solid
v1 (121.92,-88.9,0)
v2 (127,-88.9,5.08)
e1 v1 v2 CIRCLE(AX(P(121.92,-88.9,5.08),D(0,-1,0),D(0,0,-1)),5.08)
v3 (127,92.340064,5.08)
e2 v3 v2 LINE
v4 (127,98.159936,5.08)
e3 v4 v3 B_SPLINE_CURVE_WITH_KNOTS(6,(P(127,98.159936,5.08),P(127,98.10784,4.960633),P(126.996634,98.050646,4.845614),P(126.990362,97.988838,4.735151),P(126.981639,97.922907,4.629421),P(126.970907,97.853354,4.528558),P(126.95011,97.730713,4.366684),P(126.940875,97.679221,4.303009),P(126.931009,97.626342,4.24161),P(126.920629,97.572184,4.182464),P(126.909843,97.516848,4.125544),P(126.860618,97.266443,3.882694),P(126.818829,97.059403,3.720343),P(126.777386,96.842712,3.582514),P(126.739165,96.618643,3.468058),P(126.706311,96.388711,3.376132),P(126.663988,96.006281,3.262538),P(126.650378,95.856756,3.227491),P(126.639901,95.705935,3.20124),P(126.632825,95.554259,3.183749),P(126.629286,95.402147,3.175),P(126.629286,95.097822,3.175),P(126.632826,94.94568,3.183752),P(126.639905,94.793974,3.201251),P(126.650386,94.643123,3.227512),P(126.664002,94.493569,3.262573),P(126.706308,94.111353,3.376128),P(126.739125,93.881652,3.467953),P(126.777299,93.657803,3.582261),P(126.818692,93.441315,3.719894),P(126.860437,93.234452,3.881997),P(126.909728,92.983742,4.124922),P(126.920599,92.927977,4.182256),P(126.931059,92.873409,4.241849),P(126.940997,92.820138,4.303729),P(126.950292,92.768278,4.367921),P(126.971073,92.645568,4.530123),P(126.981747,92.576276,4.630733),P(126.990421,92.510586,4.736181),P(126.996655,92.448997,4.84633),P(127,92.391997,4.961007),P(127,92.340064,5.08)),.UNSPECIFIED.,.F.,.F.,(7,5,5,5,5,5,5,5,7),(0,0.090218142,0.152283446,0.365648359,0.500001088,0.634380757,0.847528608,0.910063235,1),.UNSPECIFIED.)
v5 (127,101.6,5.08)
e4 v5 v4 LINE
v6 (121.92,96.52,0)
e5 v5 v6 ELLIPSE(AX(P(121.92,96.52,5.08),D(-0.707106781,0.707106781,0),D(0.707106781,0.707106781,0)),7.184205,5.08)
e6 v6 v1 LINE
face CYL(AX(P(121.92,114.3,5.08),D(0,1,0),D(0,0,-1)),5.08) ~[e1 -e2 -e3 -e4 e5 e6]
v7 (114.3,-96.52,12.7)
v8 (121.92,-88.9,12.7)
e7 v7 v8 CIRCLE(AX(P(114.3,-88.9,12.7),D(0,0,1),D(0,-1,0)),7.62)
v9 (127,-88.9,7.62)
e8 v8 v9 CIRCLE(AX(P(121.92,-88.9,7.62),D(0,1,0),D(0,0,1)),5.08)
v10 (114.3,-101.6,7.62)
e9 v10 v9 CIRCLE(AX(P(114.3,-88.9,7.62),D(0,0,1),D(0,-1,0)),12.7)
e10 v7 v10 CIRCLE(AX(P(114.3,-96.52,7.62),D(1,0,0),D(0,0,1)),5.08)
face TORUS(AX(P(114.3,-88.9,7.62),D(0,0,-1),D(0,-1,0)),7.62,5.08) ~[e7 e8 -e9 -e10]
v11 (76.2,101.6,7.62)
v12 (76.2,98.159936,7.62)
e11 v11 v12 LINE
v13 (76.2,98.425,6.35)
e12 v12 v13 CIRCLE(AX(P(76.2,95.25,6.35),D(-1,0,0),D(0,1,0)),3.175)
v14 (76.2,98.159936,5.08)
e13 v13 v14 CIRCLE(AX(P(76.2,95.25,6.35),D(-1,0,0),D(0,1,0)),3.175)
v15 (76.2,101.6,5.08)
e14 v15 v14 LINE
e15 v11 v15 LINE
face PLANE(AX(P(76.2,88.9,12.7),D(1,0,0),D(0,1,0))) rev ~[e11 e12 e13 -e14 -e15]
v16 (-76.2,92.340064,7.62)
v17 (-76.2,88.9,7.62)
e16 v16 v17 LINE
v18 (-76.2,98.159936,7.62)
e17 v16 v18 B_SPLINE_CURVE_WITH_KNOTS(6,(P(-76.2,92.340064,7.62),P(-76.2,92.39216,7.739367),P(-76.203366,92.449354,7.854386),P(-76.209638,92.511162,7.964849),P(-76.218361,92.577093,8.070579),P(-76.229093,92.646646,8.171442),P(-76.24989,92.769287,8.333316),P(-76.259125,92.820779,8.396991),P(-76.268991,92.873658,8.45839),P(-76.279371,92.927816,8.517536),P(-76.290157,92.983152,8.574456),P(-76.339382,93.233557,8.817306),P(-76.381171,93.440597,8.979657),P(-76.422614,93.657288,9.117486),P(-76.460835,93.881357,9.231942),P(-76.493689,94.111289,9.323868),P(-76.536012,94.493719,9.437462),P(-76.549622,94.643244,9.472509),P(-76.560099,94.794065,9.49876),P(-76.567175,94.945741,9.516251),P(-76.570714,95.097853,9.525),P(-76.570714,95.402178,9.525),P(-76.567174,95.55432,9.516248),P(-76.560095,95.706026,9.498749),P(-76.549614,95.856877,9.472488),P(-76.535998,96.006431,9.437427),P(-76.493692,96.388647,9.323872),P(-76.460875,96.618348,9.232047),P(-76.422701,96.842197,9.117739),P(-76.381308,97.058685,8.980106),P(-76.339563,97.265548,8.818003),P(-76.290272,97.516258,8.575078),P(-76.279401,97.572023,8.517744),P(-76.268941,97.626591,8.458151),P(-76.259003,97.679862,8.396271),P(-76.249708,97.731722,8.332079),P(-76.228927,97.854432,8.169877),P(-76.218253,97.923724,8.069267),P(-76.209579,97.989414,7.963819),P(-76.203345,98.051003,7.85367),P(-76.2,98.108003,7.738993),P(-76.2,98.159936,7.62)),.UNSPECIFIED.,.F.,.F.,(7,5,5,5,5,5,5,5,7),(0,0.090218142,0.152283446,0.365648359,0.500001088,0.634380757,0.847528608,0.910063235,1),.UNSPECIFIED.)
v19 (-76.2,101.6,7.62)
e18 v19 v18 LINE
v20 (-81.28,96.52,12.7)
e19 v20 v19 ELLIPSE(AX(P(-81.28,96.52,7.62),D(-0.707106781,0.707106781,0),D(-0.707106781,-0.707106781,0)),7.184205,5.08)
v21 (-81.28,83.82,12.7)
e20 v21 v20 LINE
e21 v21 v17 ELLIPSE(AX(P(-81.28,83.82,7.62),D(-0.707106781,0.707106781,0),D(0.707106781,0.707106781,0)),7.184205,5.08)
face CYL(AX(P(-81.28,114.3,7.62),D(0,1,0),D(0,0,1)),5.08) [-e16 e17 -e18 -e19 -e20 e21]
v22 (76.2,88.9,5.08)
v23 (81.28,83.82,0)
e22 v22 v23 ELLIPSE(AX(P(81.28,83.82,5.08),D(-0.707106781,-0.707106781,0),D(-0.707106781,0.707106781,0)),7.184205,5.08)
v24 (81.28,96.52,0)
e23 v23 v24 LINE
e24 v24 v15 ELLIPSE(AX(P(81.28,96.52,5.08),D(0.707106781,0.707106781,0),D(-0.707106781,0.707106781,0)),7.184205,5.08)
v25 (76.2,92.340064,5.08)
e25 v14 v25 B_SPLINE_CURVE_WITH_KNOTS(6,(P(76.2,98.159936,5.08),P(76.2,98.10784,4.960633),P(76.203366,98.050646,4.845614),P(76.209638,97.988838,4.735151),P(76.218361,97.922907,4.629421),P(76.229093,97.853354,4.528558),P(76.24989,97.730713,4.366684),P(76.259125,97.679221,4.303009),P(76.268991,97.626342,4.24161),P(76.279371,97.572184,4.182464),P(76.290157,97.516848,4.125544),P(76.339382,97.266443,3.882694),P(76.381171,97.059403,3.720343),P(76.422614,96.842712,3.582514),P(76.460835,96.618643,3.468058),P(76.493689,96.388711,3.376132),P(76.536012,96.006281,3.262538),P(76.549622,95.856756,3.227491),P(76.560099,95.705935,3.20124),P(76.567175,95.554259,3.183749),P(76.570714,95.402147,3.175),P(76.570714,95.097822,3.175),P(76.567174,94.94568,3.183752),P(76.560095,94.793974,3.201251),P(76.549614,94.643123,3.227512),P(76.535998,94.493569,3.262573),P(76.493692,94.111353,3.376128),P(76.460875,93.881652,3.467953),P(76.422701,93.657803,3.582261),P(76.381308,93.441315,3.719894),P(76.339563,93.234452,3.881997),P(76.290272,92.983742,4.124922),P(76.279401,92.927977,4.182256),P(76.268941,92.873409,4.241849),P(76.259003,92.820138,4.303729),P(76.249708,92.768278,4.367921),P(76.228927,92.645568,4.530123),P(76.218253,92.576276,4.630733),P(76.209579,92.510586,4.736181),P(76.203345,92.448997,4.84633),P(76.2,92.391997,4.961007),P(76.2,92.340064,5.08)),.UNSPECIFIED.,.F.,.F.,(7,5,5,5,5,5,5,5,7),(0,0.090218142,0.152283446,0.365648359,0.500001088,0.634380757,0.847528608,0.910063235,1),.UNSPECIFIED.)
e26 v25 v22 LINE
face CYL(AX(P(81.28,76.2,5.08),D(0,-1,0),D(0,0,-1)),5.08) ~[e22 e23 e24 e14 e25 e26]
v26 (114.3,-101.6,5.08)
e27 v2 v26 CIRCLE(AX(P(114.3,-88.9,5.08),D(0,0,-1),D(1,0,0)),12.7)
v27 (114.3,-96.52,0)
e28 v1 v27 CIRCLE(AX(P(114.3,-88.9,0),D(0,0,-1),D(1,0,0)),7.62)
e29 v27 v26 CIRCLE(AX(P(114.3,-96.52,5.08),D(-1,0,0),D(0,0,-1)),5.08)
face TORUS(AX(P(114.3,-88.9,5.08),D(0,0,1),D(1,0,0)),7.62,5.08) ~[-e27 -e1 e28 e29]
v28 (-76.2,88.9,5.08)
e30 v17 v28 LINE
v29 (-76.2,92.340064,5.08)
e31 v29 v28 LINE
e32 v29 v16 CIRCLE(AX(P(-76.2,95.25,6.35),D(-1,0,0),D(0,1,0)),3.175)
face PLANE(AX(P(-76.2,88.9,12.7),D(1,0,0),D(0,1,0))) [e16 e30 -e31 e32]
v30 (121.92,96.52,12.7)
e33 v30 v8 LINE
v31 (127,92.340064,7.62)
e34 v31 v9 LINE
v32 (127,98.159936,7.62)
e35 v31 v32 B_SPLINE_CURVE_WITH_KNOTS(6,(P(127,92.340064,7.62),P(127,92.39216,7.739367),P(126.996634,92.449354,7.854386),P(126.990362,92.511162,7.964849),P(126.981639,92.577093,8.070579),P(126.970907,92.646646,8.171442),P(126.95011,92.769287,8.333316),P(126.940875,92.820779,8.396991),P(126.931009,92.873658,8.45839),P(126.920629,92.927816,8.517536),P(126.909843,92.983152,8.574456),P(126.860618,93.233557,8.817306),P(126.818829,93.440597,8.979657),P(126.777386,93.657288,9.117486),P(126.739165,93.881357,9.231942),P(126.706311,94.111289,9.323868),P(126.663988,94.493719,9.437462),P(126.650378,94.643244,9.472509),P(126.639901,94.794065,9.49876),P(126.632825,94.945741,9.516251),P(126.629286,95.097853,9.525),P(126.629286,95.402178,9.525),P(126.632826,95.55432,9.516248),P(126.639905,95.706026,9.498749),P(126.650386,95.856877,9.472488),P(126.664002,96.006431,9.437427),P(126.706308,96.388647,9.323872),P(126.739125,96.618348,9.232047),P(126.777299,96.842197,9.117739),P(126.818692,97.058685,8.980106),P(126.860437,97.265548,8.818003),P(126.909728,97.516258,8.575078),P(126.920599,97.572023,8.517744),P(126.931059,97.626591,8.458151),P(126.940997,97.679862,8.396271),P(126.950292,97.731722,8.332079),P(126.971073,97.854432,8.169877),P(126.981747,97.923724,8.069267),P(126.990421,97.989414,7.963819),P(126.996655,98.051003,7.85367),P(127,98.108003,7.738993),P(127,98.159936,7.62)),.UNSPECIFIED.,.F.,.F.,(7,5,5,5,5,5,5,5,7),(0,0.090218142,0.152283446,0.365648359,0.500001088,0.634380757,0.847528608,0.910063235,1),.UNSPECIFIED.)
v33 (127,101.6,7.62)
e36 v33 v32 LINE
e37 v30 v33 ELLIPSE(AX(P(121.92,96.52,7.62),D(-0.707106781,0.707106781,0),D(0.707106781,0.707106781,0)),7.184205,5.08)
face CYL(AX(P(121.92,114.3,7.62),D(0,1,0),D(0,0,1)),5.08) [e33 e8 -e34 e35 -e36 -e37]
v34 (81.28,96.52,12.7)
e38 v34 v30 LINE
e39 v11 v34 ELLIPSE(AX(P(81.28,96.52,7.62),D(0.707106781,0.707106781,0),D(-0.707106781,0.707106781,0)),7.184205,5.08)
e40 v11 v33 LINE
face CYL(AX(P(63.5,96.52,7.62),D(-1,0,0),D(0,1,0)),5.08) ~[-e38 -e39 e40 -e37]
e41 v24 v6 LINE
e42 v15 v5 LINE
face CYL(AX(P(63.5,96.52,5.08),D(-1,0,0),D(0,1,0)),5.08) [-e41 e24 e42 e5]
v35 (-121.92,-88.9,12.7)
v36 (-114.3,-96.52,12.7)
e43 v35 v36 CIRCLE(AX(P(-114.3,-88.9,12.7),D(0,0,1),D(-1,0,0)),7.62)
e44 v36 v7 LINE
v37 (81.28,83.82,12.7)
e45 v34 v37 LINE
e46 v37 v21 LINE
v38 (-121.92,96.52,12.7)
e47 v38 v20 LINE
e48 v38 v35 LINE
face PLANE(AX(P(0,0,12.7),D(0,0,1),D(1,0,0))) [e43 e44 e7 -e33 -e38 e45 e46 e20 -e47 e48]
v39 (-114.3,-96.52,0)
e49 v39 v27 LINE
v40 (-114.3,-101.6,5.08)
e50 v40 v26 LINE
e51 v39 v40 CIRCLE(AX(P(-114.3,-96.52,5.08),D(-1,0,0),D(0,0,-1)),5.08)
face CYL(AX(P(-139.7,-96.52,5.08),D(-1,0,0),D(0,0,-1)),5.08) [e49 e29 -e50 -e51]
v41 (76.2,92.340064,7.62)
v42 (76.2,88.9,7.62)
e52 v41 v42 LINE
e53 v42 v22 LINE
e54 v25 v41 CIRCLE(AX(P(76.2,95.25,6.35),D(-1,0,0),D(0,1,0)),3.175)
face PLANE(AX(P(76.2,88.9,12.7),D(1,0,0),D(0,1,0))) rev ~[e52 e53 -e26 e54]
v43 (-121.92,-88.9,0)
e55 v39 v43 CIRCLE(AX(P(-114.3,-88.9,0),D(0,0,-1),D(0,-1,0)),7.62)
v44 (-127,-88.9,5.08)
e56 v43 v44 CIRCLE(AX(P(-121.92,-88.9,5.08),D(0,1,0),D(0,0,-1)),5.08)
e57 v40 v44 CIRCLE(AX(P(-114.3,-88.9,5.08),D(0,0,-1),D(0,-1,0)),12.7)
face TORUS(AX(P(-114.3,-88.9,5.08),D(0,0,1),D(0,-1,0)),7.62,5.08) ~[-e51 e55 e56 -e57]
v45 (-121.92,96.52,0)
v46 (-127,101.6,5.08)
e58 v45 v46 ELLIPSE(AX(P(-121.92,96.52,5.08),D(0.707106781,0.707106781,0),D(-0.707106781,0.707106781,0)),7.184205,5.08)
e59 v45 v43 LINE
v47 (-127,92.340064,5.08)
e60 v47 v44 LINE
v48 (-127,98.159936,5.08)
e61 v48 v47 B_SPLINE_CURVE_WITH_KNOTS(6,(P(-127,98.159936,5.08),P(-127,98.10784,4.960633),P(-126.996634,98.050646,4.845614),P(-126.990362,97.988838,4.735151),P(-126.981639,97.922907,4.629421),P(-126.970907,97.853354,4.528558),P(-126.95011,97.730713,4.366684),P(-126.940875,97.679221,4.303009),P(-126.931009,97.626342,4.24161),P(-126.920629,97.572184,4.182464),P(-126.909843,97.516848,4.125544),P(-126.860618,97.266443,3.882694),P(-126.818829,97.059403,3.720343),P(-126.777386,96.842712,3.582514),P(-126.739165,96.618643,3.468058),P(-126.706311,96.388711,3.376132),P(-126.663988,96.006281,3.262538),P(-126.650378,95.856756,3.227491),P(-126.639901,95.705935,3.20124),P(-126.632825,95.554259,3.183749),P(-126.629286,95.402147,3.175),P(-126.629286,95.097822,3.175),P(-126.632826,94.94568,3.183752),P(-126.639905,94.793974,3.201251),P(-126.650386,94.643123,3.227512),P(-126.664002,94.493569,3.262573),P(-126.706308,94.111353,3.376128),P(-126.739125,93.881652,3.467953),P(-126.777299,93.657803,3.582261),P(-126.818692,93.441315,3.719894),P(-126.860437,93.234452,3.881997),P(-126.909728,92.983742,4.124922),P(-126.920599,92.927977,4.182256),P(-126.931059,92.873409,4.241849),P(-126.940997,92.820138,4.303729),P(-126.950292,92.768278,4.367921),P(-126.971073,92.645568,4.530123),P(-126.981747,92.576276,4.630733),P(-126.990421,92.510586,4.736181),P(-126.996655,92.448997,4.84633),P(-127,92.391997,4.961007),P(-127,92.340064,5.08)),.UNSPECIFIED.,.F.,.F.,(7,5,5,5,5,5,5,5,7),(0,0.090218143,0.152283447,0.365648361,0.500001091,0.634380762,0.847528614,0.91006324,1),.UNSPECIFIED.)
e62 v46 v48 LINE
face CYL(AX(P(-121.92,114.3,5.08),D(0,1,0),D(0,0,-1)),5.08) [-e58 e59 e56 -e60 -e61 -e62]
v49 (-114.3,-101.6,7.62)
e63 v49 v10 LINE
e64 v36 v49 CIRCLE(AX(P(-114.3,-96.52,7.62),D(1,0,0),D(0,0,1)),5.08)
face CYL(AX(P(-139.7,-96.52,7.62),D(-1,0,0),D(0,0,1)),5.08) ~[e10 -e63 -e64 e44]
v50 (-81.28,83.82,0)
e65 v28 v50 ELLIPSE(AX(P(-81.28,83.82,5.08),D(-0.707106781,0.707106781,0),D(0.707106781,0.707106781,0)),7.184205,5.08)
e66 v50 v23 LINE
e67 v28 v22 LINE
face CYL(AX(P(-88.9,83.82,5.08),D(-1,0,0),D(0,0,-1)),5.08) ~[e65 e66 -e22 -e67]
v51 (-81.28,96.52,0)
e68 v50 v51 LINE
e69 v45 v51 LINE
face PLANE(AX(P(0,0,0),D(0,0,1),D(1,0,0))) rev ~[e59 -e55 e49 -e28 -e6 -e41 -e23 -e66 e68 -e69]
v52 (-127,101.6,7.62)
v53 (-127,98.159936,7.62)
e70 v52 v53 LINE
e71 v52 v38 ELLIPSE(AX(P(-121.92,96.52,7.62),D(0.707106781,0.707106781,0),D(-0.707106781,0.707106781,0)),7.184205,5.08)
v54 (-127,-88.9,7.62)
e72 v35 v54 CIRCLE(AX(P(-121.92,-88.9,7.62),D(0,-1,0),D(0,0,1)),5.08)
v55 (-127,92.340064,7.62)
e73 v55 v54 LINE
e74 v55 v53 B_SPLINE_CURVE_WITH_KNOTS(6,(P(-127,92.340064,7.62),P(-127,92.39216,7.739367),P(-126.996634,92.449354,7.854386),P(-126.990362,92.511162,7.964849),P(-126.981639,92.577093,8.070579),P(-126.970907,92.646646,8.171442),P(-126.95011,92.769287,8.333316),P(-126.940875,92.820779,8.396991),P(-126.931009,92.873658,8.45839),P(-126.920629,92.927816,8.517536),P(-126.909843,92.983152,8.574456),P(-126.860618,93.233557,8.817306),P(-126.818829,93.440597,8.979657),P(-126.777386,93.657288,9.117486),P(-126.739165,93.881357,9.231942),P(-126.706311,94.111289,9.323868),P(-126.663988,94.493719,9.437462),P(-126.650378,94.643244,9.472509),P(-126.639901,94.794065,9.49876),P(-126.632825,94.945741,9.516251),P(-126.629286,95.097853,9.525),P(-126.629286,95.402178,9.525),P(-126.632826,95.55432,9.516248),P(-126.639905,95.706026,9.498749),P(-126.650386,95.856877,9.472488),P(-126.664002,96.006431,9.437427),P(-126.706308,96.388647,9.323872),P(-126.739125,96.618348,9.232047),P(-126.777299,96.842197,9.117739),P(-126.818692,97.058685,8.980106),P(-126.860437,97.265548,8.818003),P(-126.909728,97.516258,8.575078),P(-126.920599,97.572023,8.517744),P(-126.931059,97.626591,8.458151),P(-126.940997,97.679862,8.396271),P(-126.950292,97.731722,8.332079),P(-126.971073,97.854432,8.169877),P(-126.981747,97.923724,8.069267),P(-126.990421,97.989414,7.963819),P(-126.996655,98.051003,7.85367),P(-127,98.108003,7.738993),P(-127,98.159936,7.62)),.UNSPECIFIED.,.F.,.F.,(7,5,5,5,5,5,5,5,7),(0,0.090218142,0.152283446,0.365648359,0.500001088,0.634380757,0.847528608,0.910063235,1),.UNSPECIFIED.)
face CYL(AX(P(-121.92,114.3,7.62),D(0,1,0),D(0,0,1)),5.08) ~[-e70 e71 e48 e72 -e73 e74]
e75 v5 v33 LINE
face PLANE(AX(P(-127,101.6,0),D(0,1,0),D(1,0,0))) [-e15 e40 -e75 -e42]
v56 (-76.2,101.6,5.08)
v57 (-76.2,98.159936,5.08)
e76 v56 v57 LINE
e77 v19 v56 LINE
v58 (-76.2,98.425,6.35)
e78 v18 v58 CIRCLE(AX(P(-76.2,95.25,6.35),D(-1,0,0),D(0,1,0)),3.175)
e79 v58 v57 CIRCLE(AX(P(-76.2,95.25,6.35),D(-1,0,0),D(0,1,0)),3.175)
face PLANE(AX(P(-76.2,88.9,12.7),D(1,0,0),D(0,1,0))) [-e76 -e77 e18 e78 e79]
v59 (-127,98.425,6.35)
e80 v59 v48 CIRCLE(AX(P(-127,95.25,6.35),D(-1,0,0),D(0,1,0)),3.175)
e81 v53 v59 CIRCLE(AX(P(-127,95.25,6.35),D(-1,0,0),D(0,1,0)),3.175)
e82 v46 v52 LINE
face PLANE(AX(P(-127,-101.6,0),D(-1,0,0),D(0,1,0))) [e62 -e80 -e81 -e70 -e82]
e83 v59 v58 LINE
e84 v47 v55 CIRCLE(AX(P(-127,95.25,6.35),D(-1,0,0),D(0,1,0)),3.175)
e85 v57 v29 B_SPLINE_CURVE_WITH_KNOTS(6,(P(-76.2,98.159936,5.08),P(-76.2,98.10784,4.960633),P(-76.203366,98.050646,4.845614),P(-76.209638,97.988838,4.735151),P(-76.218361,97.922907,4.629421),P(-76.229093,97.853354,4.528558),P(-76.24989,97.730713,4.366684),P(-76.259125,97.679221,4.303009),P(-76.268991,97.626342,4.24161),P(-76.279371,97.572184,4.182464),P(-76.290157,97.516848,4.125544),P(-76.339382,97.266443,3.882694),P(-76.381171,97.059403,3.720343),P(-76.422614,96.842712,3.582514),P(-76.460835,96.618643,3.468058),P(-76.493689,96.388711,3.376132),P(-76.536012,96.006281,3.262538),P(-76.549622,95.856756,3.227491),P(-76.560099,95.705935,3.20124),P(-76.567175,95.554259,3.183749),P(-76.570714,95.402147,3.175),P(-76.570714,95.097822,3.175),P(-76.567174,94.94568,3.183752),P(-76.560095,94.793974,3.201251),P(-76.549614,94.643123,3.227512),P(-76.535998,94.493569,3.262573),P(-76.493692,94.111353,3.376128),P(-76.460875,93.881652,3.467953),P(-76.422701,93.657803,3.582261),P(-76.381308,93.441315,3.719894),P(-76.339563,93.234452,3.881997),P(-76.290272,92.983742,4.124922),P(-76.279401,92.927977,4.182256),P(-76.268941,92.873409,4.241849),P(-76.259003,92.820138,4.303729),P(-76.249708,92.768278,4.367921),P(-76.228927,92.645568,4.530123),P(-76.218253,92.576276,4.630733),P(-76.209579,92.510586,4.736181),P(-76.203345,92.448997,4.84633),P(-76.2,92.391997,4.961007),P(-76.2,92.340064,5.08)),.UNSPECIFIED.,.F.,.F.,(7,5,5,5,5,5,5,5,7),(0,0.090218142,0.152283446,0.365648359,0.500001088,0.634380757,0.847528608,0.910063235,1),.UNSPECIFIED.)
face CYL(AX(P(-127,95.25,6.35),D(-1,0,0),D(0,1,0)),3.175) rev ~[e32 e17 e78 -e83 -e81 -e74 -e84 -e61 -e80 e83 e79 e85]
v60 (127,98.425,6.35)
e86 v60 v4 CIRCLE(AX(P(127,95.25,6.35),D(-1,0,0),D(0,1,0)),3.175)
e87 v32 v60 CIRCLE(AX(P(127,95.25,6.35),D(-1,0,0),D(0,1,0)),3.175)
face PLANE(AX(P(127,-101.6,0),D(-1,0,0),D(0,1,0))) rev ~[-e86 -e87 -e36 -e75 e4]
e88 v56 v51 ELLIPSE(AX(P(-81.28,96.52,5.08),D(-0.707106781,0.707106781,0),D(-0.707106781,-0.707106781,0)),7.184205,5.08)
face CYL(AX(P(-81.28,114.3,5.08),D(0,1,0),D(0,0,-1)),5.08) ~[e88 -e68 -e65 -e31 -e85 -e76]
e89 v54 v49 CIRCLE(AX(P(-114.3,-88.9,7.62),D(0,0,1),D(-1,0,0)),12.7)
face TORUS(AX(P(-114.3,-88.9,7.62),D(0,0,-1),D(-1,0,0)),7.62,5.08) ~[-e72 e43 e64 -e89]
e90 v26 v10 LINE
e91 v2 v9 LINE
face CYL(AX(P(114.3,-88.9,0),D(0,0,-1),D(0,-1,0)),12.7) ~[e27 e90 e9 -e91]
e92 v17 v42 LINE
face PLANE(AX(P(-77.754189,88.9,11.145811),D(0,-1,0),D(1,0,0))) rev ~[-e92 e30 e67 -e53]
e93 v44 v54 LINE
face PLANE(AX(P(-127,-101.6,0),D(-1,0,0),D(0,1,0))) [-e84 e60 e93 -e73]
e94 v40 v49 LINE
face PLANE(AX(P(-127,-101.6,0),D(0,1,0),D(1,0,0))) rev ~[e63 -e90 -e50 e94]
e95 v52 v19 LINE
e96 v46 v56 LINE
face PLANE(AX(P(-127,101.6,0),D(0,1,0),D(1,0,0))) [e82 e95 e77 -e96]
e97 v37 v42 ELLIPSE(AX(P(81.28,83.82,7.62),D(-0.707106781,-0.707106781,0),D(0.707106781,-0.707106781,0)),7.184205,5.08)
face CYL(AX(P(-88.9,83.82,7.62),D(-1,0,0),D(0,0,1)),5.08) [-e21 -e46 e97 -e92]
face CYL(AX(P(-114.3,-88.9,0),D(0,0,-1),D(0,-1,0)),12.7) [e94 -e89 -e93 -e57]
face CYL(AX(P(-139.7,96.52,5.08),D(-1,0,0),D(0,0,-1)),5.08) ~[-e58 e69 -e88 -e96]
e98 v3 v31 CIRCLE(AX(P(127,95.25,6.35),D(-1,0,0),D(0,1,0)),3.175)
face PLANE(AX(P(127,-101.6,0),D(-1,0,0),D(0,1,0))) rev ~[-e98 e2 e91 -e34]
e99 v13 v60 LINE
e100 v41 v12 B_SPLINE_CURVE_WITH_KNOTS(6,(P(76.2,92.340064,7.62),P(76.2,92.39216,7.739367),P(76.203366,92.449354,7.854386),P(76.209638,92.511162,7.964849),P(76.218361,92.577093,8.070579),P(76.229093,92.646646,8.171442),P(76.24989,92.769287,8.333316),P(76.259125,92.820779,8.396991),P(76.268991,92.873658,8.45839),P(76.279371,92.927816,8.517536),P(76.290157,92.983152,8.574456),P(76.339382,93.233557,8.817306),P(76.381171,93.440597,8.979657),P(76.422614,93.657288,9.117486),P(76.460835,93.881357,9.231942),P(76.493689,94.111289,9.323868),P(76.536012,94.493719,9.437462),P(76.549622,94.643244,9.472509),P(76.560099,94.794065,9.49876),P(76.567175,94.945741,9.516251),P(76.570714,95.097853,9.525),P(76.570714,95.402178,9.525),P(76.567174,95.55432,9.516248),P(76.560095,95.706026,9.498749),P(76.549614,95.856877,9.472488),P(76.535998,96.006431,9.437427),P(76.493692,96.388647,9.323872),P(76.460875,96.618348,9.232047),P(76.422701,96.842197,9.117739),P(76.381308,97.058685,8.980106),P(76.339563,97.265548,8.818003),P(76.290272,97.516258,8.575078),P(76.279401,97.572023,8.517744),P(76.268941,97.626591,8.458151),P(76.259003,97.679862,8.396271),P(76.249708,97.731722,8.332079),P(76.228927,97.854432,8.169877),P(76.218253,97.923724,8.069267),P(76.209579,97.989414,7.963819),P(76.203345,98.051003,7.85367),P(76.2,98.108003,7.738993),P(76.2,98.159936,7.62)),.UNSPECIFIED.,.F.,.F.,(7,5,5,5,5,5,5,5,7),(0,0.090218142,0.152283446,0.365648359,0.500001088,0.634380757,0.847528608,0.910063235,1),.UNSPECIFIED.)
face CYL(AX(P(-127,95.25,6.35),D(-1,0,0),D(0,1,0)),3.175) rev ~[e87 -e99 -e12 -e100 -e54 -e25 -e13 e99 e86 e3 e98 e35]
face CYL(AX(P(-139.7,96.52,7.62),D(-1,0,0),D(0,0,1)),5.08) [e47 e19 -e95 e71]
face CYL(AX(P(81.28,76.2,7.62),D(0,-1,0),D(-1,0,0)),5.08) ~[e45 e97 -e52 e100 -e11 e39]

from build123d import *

# Parameters (mm, degrees)
F0_W         = 254
F0_H         = 203.2
F1_DEPTH     = 12.7
F4_DEPTH     = 254.001
F2_W         = 76.2
F2_H         = 12.7
F5_DEPTH     = 12.701
F6_T1_DEPTH  = 228.6
F6_T3_DEPTH  = 279.4
F6_T5_DEPTH  = 76.2
F6_T7_DEPTH  = 25.4
F6_T9_DEPTH  = 152.4
F6_T11_DEPTH = 76.2
F6_T17_DEPTH = 38.1
F6_T21_DEPTH = 165.1
F6_T28_DEPTH = 38.1
F6_T32_DEPTH = 165.1
F6_T39_DEPTH = 38.1
F6_T43_DEPTH = 165.1
F6_T50_DEPTH = 165.1
F6_T54_DEPTH = 38.1
F7_T1_DEPTH  = 12.7000000002
F7_T4_ANGLE  = 90
F7_T6_ANGLE  = 90
F7_T8_ANGLE  = 90
F7_T10_ANGLE = 90


# Not quite as in the source:
# - a fillet or chamfer that OpenCascade refuses, or shapes differently, is made with other operations: its cross-section is extruded or revolved along the edge and cut away or added


with BuildPart() as f1:
    # F0 (on Top) → F1 (new body)
    with BuildSketch(Plane.XY):
        Rectangle(F0_W, F0_H)
    extrude(amount=F1_DEPTH)

    # F3 (on face) → F4 (cut, through all)
    with BuildSketch(Plane(origin=(-127, 0, 0), x_dir=(0, -1, 0), z_dir=(-1, 0, 0))):
        with BuildLine():
            ThreePointArc((-92.075, 6.35), (-95.25, 9.525), (-98.425, 6.35))
            Line((-98.425, 6.35), (-92.075, 6.35))
        make_face()
        with BuildLine():
            Line((-92.075, 6.35), (-98.425, 6.35))
            ThreePointArc((-98.425, 6.35), (-95.25, 3.175), (-92.075, 6.35))
        make_face()
    extrude(amount=-F4_DEPTH, mode=Mode.SUBTRACT)

    # F2 (on face) → F5 (cut, through all)
    with BuildSketch(Plane.XY.offset(12.7)):
        with Locations((-38.1, 95.25)):
            Rectangle(F2_W, F2_H)
        with Locations((38.1, 95.25)):
            Rectangle(F2_W, F2_H)
    extrude(amount=-F5_DEPTH, mode=Mode.SUBTRACT)

    # F6: fillet of radius 5.08 on 16 edges, made by hand

    # F6_s2 → F6_t1 (cut)
    with BuildSketch(Plane.XZ.offset(-114.3)):
        with BuildLine():
            ThreePointArc((121.92, 12.7), (125.5121024484, 11.2121024484), (127, 7.62))
            Line((127, 7.62), (127, 12.7))
            Line((127, 12.7), (121.92, 12.7))
        make_face()
        with BuildLine():
            ThreePointArc((-121.92, 12.7), (-125.5121024484, 11.2121024484), (-127, 7.62))
            Line((-127, 7.62), (-127, 12.7))
            Line((-127, 12.7), (-121.92, 12.7))
        make_face()
        with BuildLine():
            ThreePointArc((121.92, 0), (125.5121024484, 1.4878975516), (127, 5.08))
            Line((127, 5.08), (127, 0))
            Line((127, 0), (121.92, 0))
        make_face()
        with BuildLine():
            ThreePointArc((-121.92, 0), (-125.5121024484, 1.4878975516), (-127, 5.08))
            Line((-127, 5.08), (-127, 0))
            Line((-127, 0), (-121.92, 0))
        make_face()
    extrude(amount=F6_T1_DEPTH, mode=Mode.SUBTRACT)

    # F6_s4 → F6_t3 (cut)
    with BuildSketch(Plane.YZ.offset(-139.7)):
        with BuildLine():
            ThreePointArc((-96.52, 12.7), (-100.1121024484, 11.2121024484), (-101.6, 7.62))
            Line((-101.6, 7.62), (-101.6, 12.7))
            Line((-101.6, 12.7), (-96.52, 12.7))
        make_face()
        with BuildLine():
            ThreePointArc((-96.52, 0), (-100.1121024484, 1.4878975516), (-101.6, 5.08))
            Line((-101.6, 5.08), (-101.6, 0))
            Line((-101.6, 0), (-96.52, 0))
        make_face()
    extrude(amount=F6_T3_DEPTH, mode=Mode.SUBTRACT)

    # F6_s6 → F6_t5 (cut)
    with BuildSketch(Plane.YZ.offset(-139.7)):
        with BuildLine():
            ThreePointArc((96.52, 12.7), (100.1121024484, 11.2121024484), (101.6, 7.62))
            Line((101.6, 7.62), (101.6, 12.7))
            Line((101.6, 12.7), (96.52, 12.7))
        make_face()
        with BuildLine():
            ThreePointArc((96.52, 0), (100.1121024484, 1.4878975516), (101.6, 5.08))
            Line((101.6, 5.08), (101.6, 0))
            Line((101.6, 0), (96.52, 0))
        make_face()
    extrude(amount=F6_T5_DEPTH, mode=Mode.SUBTRACT)

    # F6_s8 → F6_t7 (cut)
    with BuildSketch(Plane.XZ.offset(-114.3)):
        with BuildLine():
            ThreePointArc((-81.28, 12.7), (-77.6878975516, 11.2121024484), (-76.2, 7.62))
            Line((-76.2, 7.62), (-76.2, 12.7))
            Line((-76.2, 12.7), (-81.28, 12.7))
        make_face()
        with BuildLine():
            ThreePointArc((76.2, 7.62), (77.6878975516, 11.2121024484), (81.28, 12.7))
            Line((81.28, 12.7), (76.2, 12.7))
            Line((76.2, 12.7), (76.2, 7.62))
        make_face()
        with BuildLine():
            ThreePointArc((-81.28, 0), (-77.6878975516, 1.4878975516), (-76.2, 5.08))
            Line((-76.2, 5.08), (-76.2, 0))
            Line((-76.2, 0), (-81.28, 0))
        make_face()
        with BuildLine():
            ThreePointArc((81.28, 0), (77.6878975516, 1.4878975516), (76.2, 5.08))
            Line((76.2, 5.08), (76.2, 0))
            Line((76.2, 0), (81.28, 0))
        make_face()
    extrude(amount=F6_T7_DEPTH, mode=Mode.SUBTRACT)

    # F6_s10 → F6_t9 (cut)
    with BuildSketch(Plane.YZ.offset(-76.2)):
        with BuildLine():
            ThreePointArc((83.82, 12.7), (87.4121024484, 11.2121024484), (88.9, 7.62))
            Line((88.9, 7.62), (88.9, 12.7))
            Line((88.9, 12.7), (83.82, 12.7))
        make_face()
        with BuildLine():
            ThreePointArc((83.82, 0), (87.4121024484, 1.4878975516), (88.9, 5.08))
            Line((88.9, 5.08), (88.9, 0))
            Line((88.9, 0), (83.82, 0))
        make_face()
    extrude(amount=F6_T9_DEPTH, mode=Mode.SUBTRACT)

    # F6_s12 → F6_t11 (cut)
    with BuildSketch(Plane.YZ.offset(63.5)):
        with BuildLine():
            ThreePointArc((101.6, 7.62), (100.1121024484, 11.2121024484), (96.52, 12.7))
            Line((96.52, 12.7), (101.6, 12.7))
            Line((101.6, 12.7), (101.6, 7.62))
        make_face()
        with BuildLine():
            ThreePointArc((101.6, 5.08), (100.1121024484, 1.4878975516), (96.52, 0))
            Line((96.52, 0), (101.6, 0))
            Line((101.6, 0), (101.6, 5.08))
        make_face()
    extrude(amount=F6_T11_DEPTH, mode=Mode.SUBTRACT)


with BuildPart() as f6_tool15:
    # F6_s16 → F6_t17 (new body)
    with BuildSketch(Plane.XZ.offset(-114.3)):
        with BuildLine():
            ThreePointArc((-81.28, 12.7), (-77.6878975516, 11.2121024484), (-76.2, 7.62))
            Line((-76.2, 7.62), (-76.2, 12.7))
            Line((-76.2, 12.7), (-81.28, 12.7))
        make_face()
    extrude(amount=F6_T17_DEPTH)

    split(bisect_by=Plane.XZ.offset(-88.9), keep=Keep.TOP)


with BuildPart() as f6_tool19:
    # F6_s20 → F6_t21 (new body)
    with BuildSketch(Plane.YZ.offset(-88.9)):
        with BuildLine():
            ThreePointArc((83.82, 12.7), (87.4121024484, 11.2121024484), (88.9, 7.62))
            Line((88.9, 7.62), (88.9, 12.7))
            Line((88.9, 12.7), (83.82, 12.7))
        make_face()
    extrude(amount=F6_T21_DEPTH)

    split(bisect_by=Plane.YZ.offset(-76.2), keep=Keep.BOTTOM)


with BuildPart() as f6_tool15_1:
    add(f6_tool15.part)

    # F6_t23: intersect F6_tool19
    add(f6_tool19.part, mode=Mode.INTERSECT)


with BuildPart() as f1_1:
    add(f1.part)

    # F6_t13: cut F6_tool15
    add(f6_tool15_1.part, mode=Mode.SUBTRACT)


with BuildPart() as f6_tool26:
    # F6_s27 → F6_t28 (new body)
    with BuildSketch(Plane.XZ.offset(-76.2)):
        with BuildLine():
            ThreePointArc((76.2, 7.62), (77.6878975516, 11.2121024484), (81.28, 12.7))
            Line((81.28, 12.7), (76.2, 12.7))
            Line((76.2, 12.7), (76.2, 7.62))
        make_face()
    extrude(amount=-F6_T28_DEPTH)

    split(bisect_by=Plane.XZ.offset(-88.9), keep=Keep.TOP)


with BuildPart() as f6_tool30:
    # F6_s31 → F6_t32 (new body)
    with BuildSketch(Plane.YZ.offset(-76.2)):
        with BuildLine():
            ThreePointArc((83.82, 12.7), (87.4121024484, 11.2121024484), (88.9, 7.62))
            Line((88.9, 7.62), (88.9, 12.7))
            Line((88.9, 12.7), (83.82, 12.7))
        make_face()
    extrude(amount=F6_T32_DEPTH)

    split(bisect_by=Plane.YZ.offset(76.2), keep=Keep.TOP)


with BuildPart() as f6_tool26_1:
    add(f6_tool26.part)

    # F6_t34: intersect F6_tool30
    add(f6_tool30.part, mode=Mode.INTERSECT)


with BuildPart() as f1_2:
    add(f1_1.part)

    # F6_t24: cut F6_tool26
    add(f6_tool26_1.part, mode=Mode.SUBTRACT)


with BuildPart() as f6_tool37:
    # F6_s38 → F6_t39 (new body)
    with BuildSketch(Plane.XZ.offset(-114.3)):
        with BuildLine():
            ThreePointArc((-81.28, 0), (-77.6878975516, 1.4878975516), (-76.2, 5.08))
            Line((-76.2, 5.08), (-76.2, 0))
            Line((-76.2, 0), (-81.28, 0))
        make_face()
    extrude(amount=F6_T39_DEPTH)

    split(bisect_by=Plane.XZ.offset(-88.9), keep=Keep.TOP)


with BuildPart() as f6_tool41:
    # F6_s42 → F6_t43 (new body)
    with BuildSketch(Plane.YZ.offset(-88.9)):
        with BuildLine():
            ThreePointArc((83.82, 0), (87.4121024484, 1.4878975516), (88.9, 5.08))
            Line((88.9, 5.08), (88.9, 0))
            Line((88.9, 0), (83.82, 0))
        make_face()
    extrude(amount=F6_T43_DEPTH)

    split(bisect_by=Plane.YZ.offset(-76.2), keep=Keep.BOTTOM)


with BuildPart() as f6_tool37_1:
    add(f6_tool37.part)

    # F6_t45: intersect F6_tool41
    add(f6_tool41.part, mode=Mode.INTERSECT)


with BuildPart() as f1_3:
    add(f1_2.part)

    # F6_t35: cut F6_tool37
    add(f6_tool37_1.part, mode=Mode.SUBTRACT)


with BuildPart() as f6_tool48:
    # F6_s49 → F6_t50 (new body)
    with BuildSketch(Plane.YZ.offset(-76.2)):
        with BuildLine():
            ThreePointArc((83.82, 0), (87.4121024484, 1.4878975516), (88.9, 5.08))
            Line((88.9, 5.08), (88.9, 0))
            Line((88.9, 0), (83.82, 0))
        make_face()
    extrude(amount=F6_T50_DEPTH)

    split(bisect_by=Plane.YZ.offset(76.2), keep=Keep.TOP)


with BuildPart() as f6_tool52:
    # F6_s53 → F6_t54 (new body)
    with BuildSketch(Plane.XZ.offset(-76.2)):
        with BuildLine():
            ThreePointArc((81.28, 0), (77.6878975516, 1.4878975516), (76.2, 5.08))
            Line((76.2, 5.08), (76.2, 0))
            Line((76.2, 0), (81.28, 0))
        make_face()
    extrude(amount=-F6_T54_DEPTH)

    split(bisect_by=Plane.XZ.offset(-88.9), keep=Keep.TOP)


with BuildPart() as f6_tool48_1:
    add(f6_tool48.part)

    # F6_t56: intersect F6_tool52
    add(f6_tool52.part, mode=Mode.INTERSECT)


with BuildPart() as f1_4:
    add(f1_3.part)

    # F6_t46: cut F6_tool48
    add(f6_tool48_1.part, mode=Mode.SUBTRACT)

    # F7: fillet of radius 12.7 on 2 edges, made by hand

    # F7_s2 → F7_t1 (cut)
    with BuildSketch(Plane.XY):
        with BuildLine():
            ThreePointArc((-114.3, -101.6), (-123.2802561211, -97.8802561211), (-127, -88.9))
            Line((-127, -88.9), (-127, -101.6))
            Line((-127, -101.6), (-114.3, -101.6))
        make_face()
        with BuildLine():
            ThreePointArc((114.3, -101.6), (123.2802561211, -97.8802561211), (127, -88.9))
            Line((127, -88.9), (127, -101.6))
            Line((127, -101.6), (114.3, -101.6))
        make_face()
    extrude(amount=F7_T1_DEPTH, mode=Mode.SUBTRACT)

    # F7_s3 → F7_t4 (revolve, cut)
    with BuildSketch(Plane.XZ.offset(88.9)):
        with BuildLine():
            ThreePointArc((121.9199999999, 0), (125.5121024484, 1.4878975516), (127, 5.0800000001))
            Line((127, 5.0800000001), (127, 0))
            Line((127, 0), (121.9199999999, 0))
        make_face()
    revolve(axis=Axis((114.3, -88.9, 0), (0, 0, -1)), revolution_arc=F7_T4_ANGLE, mode=Mode.SUBTRACT)

    # F7_s5 → F7_t6 (revolve, cut)
    with BuildSketch(Plane.YZ.offset(114.3)):
        with BuildLine():
            ThreePointArc((-96.5199999999, 12.7), (-100.1121024484, 11.2121024484), (-101.6, 7.6199999999))
            Line((-101.6, 7.6199999999), (-101.6, 12.7))
            Line((-101.6, 12.7), (-96.5199999999, 12.7))
        make_face()
    revolve(axis=Axis((114.3, -88.9, 12.7), (0, 0, 1)), revolution_arc=F7_T6_ANGLE, mode=Mode.SUBTRACT)

    # F7_s7 → F7_t8 (revolve, cut)
    with BuildSketch(Plane.YZ.offset(-114.3)):
        with BuildLine():
            ThreePointArc((-96.5199999999, 0), (-100.1121024484, 1.4878975516), (-101.6, 5.0800000001))
            Line((-101.6, 5.0800000001), (-101.6, 0))
            Line((-101.6, 0), (-96.5199999999, 0))
        make_face()
    revolve(axis=Axis((-114.3, -88.9, 0), (0, 0, -1)), revolution_arc=F7_T8_ANGLE, mode=Mode.SUBTRACT)

    # F7_s9 → F7_t10 (revolve, cut)
    with BuildSketch(Plane.XZ.offset(88.9)):
        with BuildLine():
            ThreePointArc((-121.9199999999, 12.7), (-125.5121024484, 11.2121024484), (-127, 7.6199999999))
            Line((-127, 7.6199999999), (-127, 12.7))
            Line((-127, 12.7), (-121.9199999999, 12.7))
        make_face()
    revolve(axis=Axis((-114.3, -88.9, 12.7), (0, 0, 1)), revolution_arc=F7_T10_ANGLE, mode=Mode.SUBTRACT)


solid = f1_4.part
